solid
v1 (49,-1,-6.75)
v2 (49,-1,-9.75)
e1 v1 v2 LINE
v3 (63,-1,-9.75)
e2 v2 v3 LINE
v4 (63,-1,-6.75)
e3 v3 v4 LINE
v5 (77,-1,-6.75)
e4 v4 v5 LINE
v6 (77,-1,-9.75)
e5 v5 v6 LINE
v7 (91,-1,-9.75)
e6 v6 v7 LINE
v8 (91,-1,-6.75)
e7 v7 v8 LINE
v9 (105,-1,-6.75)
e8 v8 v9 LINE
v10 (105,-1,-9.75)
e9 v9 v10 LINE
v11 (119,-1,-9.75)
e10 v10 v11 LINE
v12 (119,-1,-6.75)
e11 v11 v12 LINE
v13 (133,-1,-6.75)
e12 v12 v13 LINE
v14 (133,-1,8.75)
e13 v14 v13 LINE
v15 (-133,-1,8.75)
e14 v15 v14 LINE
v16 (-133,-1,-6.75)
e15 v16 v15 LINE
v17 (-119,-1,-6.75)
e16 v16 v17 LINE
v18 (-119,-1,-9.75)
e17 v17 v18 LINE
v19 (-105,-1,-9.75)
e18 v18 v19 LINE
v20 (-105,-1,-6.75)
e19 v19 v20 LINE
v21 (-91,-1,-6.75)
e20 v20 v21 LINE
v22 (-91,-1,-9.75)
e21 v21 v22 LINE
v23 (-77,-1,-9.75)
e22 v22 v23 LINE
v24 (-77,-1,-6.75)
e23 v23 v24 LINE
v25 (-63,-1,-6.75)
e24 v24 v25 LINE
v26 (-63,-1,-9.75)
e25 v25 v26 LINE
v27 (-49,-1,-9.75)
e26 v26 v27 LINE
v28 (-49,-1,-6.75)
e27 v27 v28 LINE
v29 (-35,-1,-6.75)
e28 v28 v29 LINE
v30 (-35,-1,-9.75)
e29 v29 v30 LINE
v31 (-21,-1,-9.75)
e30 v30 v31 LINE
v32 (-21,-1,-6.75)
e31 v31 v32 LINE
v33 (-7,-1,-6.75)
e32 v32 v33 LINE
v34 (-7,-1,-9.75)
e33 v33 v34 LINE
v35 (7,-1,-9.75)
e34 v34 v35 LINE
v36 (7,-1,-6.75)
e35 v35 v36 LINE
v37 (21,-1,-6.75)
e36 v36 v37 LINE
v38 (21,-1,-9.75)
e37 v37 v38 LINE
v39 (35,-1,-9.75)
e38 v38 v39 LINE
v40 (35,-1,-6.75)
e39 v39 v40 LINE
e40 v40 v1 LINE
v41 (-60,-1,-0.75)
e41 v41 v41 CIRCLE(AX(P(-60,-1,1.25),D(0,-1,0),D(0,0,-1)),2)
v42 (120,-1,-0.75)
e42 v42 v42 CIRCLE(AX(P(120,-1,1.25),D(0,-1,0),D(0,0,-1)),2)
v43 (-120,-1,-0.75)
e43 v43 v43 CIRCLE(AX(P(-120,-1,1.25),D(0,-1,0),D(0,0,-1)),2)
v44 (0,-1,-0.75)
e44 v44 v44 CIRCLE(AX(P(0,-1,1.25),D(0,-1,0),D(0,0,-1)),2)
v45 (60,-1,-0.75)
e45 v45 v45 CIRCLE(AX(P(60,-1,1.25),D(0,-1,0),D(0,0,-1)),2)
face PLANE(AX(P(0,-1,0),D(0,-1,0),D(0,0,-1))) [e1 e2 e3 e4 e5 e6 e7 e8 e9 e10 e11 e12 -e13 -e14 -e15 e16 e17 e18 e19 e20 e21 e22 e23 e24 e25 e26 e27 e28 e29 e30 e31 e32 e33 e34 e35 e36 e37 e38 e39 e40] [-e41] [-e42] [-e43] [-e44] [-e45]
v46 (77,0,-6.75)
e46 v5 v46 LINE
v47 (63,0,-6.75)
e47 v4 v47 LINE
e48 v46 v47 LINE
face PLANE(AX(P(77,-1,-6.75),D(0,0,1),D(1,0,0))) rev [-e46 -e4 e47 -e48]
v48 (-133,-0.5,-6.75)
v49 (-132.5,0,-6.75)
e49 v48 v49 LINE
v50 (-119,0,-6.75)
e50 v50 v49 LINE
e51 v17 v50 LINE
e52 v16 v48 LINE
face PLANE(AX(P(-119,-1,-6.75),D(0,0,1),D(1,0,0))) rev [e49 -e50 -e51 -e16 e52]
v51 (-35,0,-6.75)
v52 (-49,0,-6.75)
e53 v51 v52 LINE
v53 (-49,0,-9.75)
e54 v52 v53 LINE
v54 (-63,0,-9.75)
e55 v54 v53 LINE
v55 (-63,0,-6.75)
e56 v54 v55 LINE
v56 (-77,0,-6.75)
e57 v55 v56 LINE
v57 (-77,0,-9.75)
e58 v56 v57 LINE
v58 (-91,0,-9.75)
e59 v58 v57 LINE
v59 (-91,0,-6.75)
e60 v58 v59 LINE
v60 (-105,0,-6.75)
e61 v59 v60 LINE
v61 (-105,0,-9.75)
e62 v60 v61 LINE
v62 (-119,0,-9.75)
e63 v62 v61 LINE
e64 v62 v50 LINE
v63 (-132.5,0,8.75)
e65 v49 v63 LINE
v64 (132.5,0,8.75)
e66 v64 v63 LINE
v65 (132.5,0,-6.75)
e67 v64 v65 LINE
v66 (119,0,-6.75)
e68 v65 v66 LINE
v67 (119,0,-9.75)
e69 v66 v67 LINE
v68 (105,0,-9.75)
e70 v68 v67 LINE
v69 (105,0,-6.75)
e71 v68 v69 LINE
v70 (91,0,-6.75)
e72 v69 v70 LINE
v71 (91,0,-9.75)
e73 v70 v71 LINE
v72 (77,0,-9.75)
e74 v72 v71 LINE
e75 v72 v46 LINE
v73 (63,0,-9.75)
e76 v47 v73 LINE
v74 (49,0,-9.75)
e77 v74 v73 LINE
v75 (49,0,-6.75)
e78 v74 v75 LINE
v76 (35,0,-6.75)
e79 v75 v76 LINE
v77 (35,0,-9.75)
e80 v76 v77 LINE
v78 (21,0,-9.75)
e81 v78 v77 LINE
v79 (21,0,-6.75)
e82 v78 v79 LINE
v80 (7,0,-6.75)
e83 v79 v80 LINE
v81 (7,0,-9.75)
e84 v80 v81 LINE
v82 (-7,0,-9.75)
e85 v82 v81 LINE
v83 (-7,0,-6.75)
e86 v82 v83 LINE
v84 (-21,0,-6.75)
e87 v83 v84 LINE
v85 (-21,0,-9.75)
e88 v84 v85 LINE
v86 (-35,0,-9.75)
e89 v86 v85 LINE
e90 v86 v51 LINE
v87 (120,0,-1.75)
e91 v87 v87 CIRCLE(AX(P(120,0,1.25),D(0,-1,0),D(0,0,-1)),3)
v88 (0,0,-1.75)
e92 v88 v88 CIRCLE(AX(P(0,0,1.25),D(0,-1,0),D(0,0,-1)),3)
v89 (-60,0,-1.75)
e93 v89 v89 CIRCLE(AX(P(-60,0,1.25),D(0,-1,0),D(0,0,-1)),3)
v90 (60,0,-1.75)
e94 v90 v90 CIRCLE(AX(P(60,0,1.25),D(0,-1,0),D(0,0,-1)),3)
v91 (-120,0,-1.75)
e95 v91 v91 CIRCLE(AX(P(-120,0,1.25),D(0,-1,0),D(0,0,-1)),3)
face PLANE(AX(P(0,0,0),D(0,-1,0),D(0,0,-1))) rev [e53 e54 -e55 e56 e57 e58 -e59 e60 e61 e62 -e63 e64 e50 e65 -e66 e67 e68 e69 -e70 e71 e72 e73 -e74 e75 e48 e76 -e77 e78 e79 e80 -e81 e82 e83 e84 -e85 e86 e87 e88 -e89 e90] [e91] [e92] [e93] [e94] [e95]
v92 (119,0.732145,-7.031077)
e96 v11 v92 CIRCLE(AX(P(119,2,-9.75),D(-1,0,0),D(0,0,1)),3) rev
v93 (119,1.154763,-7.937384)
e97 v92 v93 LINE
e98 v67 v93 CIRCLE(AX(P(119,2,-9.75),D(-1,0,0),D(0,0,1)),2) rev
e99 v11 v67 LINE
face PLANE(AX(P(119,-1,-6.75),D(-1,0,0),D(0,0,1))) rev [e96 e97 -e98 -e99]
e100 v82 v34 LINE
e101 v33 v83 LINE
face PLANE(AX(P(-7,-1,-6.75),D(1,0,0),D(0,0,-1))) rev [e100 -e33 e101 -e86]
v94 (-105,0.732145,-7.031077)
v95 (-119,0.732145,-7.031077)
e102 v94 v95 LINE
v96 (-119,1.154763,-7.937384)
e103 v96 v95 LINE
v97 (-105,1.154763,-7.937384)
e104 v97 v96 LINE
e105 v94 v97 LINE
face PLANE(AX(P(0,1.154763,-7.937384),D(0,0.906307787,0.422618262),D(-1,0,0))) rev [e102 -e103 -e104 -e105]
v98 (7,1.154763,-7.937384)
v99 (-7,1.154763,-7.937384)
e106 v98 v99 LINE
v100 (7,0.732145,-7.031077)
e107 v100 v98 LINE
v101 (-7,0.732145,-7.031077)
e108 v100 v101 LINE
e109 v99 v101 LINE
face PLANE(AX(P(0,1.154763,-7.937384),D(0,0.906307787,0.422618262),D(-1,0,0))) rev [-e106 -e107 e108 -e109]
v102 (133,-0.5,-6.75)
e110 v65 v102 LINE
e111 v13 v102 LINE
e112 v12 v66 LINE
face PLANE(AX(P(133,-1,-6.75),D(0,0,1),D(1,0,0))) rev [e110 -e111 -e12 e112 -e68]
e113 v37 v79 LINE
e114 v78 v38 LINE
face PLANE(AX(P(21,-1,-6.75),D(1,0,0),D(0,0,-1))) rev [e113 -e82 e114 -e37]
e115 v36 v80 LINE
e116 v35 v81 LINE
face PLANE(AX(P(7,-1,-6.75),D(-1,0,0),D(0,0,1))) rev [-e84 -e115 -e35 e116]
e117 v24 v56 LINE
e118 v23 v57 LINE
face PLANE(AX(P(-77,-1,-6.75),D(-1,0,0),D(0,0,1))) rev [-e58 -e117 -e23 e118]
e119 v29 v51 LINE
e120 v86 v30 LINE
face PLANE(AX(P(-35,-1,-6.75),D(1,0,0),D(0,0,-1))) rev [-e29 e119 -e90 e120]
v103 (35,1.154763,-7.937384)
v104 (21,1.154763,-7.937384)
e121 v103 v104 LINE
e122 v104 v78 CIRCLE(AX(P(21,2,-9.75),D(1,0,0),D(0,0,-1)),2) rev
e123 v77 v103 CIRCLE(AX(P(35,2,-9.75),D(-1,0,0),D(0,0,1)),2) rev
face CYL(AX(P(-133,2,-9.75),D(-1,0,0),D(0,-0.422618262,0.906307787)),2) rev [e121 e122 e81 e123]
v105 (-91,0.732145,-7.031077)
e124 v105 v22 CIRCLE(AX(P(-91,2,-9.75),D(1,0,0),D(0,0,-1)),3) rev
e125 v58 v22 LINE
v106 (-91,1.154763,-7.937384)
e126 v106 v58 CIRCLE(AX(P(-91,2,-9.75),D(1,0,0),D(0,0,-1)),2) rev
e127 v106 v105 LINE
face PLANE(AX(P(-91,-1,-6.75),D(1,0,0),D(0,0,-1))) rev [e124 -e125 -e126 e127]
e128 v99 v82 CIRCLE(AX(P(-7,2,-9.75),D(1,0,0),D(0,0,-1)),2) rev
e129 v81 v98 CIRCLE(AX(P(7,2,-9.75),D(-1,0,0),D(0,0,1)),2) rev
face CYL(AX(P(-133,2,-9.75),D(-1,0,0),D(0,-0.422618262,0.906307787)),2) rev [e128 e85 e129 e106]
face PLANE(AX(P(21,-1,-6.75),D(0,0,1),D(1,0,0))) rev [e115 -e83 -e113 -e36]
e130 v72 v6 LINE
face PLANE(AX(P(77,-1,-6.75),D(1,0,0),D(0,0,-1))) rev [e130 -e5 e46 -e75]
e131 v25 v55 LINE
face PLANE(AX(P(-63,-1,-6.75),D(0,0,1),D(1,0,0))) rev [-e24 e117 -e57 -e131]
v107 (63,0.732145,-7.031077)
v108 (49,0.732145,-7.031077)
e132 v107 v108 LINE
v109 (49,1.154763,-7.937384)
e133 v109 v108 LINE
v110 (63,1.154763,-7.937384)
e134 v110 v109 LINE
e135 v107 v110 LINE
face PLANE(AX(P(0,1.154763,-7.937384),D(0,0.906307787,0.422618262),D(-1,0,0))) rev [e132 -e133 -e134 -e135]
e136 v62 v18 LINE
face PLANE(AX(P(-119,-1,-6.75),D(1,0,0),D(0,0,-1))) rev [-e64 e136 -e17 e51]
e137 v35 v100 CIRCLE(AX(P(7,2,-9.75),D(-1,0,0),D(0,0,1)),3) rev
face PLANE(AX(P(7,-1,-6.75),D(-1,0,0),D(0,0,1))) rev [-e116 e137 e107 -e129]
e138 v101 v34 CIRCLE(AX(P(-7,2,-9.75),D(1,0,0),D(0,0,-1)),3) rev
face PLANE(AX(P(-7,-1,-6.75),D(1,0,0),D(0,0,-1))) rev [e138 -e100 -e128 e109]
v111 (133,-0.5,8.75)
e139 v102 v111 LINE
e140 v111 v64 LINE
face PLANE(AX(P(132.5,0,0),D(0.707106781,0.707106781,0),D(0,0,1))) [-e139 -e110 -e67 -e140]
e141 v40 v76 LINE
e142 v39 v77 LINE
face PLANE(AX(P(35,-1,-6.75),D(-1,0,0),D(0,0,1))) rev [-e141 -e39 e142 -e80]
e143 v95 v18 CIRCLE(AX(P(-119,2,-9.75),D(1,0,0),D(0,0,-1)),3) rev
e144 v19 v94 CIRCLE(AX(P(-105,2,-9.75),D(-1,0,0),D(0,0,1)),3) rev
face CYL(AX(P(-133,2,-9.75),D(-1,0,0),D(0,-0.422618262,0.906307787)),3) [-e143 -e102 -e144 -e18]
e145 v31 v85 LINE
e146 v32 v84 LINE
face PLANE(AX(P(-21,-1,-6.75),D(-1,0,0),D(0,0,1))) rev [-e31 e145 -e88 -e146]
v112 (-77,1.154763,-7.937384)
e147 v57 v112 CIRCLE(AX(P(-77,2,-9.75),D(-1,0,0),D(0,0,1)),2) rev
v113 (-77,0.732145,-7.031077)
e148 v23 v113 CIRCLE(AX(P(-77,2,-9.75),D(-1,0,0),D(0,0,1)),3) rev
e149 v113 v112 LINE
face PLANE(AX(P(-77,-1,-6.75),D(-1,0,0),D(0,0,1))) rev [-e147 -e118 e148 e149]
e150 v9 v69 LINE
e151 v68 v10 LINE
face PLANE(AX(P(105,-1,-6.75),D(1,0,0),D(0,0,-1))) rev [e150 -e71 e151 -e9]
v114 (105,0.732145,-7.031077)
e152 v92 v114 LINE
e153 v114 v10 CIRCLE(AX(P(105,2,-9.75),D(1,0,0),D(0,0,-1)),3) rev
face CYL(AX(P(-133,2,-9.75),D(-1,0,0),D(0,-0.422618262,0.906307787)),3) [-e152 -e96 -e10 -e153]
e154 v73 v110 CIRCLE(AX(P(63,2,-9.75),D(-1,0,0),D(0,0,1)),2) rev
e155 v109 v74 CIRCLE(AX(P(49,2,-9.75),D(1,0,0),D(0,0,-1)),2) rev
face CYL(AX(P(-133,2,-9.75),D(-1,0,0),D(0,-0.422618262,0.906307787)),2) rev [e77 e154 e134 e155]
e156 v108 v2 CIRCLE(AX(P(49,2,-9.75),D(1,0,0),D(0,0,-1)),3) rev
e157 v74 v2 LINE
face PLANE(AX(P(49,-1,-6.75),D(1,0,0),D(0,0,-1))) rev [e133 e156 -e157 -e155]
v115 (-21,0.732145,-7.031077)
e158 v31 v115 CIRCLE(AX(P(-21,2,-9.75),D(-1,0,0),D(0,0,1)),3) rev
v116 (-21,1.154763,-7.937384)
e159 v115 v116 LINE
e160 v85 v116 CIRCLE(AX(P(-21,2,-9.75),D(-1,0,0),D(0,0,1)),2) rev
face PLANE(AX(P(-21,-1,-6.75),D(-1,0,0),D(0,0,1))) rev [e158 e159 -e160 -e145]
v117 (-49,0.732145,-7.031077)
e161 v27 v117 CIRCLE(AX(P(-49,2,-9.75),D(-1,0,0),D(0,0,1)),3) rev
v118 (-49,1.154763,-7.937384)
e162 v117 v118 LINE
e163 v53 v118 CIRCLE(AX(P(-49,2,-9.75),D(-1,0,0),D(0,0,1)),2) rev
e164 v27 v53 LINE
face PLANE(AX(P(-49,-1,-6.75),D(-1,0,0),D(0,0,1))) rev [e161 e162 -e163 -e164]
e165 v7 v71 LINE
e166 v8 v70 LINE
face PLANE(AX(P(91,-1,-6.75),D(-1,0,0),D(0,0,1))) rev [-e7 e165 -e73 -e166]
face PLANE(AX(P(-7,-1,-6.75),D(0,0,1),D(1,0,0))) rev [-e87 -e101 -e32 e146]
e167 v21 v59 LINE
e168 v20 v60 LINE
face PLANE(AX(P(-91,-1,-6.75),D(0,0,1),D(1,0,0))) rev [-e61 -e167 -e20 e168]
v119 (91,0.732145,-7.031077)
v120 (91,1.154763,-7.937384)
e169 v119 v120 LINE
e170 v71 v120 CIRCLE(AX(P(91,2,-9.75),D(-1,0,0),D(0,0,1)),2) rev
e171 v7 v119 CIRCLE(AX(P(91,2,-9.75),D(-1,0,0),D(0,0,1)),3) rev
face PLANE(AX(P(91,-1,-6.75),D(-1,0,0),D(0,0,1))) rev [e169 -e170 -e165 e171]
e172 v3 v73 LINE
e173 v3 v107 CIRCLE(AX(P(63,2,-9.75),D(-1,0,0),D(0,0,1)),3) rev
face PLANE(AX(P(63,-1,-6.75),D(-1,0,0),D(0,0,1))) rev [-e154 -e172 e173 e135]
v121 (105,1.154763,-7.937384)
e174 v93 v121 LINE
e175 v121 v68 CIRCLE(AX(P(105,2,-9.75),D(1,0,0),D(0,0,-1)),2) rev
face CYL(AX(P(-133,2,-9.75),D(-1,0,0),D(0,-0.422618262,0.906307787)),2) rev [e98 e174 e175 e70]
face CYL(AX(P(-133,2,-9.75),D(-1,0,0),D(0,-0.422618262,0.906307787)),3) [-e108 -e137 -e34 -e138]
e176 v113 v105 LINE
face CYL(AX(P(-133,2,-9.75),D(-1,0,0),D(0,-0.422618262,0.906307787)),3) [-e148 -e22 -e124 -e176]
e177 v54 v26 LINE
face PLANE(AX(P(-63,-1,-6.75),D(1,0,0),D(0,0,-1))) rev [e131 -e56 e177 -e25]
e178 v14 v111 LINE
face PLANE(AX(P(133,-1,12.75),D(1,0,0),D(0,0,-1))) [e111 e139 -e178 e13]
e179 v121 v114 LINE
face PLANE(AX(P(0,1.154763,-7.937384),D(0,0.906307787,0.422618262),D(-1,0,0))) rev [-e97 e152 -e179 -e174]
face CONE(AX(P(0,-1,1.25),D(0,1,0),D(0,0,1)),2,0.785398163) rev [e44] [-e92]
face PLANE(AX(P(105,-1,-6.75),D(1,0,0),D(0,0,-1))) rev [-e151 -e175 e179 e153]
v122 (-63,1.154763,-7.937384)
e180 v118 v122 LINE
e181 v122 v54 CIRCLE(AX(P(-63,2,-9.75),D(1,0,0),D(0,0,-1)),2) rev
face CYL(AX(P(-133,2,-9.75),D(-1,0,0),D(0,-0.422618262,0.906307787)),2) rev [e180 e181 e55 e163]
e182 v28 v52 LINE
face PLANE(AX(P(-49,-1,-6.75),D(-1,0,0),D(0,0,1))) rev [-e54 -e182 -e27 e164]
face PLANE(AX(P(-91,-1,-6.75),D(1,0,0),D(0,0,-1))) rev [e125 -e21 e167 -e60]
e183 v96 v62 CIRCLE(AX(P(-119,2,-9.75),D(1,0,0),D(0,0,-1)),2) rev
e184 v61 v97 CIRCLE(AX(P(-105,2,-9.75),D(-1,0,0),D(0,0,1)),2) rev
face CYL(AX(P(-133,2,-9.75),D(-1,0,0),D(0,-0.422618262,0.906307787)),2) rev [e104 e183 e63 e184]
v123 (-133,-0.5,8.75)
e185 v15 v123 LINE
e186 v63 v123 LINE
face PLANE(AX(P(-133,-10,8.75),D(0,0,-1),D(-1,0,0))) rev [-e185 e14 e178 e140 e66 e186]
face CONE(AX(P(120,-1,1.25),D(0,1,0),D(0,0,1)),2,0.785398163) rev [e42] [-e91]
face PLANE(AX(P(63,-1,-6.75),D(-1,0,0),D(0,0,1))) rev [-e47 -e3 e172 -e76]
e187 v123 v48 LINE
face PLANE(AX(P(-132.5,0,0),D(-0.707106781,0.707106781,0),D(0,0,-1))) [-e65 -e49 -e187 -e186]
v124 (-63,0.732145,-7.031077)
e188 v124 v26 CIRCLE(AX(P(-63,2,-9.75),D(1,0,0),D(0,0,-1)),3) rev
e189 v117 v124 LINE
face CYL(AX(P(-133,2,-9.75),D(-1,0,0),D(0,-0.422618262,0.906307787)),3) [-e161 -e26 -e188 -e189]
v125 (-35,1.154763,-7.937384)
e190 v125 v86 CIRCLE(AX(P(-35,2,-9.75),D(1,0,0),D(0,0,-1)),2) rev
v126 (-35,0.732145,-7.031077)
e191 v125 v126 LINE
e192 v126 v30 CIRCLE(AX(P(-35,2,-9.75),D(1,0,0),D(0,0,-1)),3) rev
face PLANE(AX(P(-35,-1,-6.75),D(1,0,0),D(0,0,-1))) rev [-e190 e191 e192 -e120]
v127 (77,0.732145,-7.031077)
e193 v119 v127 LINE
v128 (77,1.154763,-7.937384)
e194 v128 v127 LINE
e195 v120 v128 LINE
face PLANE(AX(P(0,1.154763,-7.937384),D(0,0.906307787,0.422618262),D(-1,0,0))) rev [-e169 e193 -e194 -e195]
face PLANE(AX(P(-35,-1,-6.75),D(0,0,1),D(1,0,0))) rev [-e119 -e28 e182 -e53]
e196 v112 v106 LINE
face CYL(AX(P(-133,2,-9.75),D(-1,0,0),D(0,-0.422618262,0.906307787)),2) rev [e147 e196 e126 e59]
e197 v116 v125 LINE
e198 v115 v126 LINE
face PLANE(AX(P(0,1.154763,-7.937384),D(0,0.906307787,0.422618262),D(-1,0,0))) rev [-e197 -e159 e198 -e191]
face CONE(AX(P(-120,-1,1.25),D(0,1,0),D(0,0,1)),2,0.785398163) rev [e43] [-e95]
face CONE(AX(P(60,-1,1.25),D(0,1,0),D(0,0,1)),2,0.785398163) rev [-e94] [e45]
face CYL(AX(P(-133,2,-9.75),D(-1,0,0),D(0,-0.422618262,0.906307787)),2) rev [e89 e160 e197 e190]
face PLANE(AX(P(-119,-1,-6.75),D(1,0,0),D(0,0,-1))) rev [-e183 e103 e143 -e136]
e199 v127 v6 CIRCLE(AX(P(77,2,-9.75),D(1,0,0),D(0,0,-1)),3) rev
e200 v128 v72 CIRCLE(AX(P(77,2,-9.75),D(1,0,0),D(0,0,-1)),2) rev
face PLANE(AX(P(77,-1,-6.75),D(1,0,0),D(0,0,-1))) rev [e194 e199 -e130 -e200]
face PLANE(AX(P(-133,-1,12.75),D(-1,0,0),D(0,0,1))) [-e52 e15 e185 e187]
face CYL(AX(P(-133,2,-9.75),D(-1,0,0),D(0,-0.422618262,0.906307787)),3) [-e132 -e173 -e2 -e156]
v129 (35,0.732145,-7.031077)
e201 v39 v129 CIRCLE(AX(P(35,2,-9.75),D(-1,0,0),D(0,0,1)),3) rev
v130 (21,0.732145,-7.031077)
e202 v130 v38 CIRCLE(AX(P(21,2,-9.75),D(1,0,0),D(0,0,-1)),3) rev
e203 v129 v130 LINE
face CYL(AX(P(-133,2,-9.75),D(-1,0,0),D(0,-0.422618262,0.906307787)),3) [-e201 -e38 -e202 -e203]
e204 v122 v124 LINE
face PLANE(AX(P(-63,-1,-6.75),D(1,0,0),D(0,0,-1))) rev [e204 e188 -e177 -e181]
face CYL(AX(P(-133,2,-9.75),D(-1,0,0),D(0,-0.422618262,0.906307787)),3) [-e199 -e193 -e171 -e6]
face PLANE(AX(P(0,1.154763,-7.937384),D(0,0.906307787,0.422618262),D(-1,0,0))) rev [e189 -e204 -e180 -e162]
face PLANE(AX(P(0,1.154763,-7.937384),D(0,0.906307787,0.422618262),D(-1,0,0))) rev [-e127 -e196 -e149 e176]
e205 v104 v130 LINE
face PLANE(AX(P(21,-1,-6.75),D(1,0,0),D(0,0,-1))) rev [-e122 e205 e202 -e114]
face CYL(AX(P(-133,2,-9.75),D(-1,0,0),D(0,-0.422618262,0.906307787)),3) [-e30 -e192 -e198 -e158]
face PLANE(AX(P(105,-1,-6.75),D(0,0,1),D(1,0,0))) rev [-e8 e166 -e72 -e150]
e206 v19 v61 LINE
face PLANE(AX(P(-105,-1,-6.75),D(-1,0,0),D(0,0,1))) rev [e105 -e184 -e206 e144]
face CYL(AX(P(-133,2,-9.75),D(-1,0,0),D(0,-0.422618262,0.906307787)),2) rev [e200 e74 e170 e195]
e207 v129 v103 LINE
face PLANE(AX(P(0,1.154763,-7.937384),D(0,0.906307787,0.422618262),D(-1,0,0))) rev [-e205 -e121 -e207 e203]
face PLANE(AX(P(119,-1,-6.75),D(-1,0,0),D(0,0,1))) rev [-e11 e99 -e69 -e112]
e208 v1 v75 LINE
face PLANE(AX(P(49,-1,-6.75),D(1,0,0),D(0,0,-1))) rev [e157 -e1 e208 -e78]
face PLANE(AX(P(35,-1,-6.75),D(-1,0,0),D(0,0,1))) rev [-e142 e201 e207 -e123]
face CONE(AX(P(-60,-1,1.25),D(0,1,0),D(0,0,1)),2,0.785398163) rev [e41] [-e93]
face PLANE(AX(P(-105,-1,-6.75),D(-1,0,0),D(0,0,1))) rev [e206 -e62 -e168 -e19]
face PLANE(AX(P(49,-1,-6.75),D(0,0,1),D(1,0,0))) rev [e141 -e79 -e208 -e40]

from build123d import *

# Parameters (mm, degrees)
SKETCH1_W          = 266
SKETCH1_H          = 25.5
BASE_FLANGE1_DEPTH = 1
HEM1_START         = -133
HEM1_DEPTH         = 266
HEM1_2_DEPTH       = 266
CUT_EXTRUDE1_START = -134.703262862
SKETCH8_W          = 14
SKETCH8_H          = 6
CUT_EXTRUDE1_DEPTH = 259.406525724
LPATTERN1_COUNT    = 11
LPATTERN1_PITCH    = 28
CHAMFER1_SIZE      = 0.5
SKETCH10_W         = 266
SKETCH10_H         = 4
CUT_EXTRUDE3_DEPTH = 10
SKETCH9_R          = 2
CUT_EXTRUDE2_DEPTH = 10
LPATTERN2_COUNT    = 5
LPATTERN2_PITCH    = 60
CHAMFER2_SIZE      = 1


# Read off the part's stored shape, not the designer's step: Hem1
# Sheet-metal steps are written as plain solids
with BuildPart() as part:
    # Sketch1 → Base-Flange1 (new body)
    with BuildSketch(Plane(origin=(0, 0, 0), x_dir=(1, 0, 0), z_dir=(0, 1, 0))):
        Rectangle(SKETCH1_W, SKETCH1_H)
    extrude(amount=-BASE_FLANGE1_DEPTH)

    # Hem1 outline → Hem1 (cut)
    with BuildSketch(Plane.YZ.offset(HEM1_START)):
        with BuildLine():
            Line((0, -12.75), (0, -11.986067977))
            ThreePointArc((0, -11.986067977), (-0.738612788, -10.974744871), (-1, -9.75))
            Line((-1, -9.75), (-1, -12.75))
            Line((-1, -12.75), (0, -12.75))
        make_face()
    extrude(amount=HEM1_DEPTH, mode=Mode.SUBTRACT)

    # Hem1 2 outline → Hem1 2 (add)
    with BuildSketch(Plane.YZ.offset(HEM1_START)):
        with BuildLine():
            Line((0.732145215, -7.031076639), (1.154763477, -7.937384426))
            ThreePointArc((1.154763477, -7.937384426), (3.686782892, -10.824599218), (0, -9.75))
            Line((0, -9.75), (0, -11.986067977))
            ThreePointArc((0, -11.986067977), (4.967777538, -10.18851623), (0.732145215, -7.031076639))
        make_face()
    extrude(amount=HEM1_2_DEPTH)

    # Sketch8 → Cut-Extrude1 (cut)
    with BuildSketch(Plane(origin=(0, 0, 0), x_dir=(1, 0, 0), z_dir=(0, 1, 0)).offset(CUT_EXTRUDE1_START)):
        with Locations((126, 9.75)):
            Rectangle(SKETCH8_W, SKETCH8_H)
    cut_extrude1 = extrude(amount=CUT_EXTRUDE1_DEPTH, mode=Mode.SUBTRACT)

    # LPattern1: Cut-Extrude1 ×11
    with Locations(*[(-i * LPATTERN1_PITCH, 0, 0) for i in range(1, LPATTERN1_COUNT)]):
        add(cut_extrude1, mode=Mode.SUBTRACT)

    # Chamfer1
    chamfer1_edges = [part.edges().sort_by_distance(p)[0] for p in [
        (-133, 0, 3),
        (0, 0, 12.75),
        (133, 0, 3),
    ]]
    chamfer(chamfer1_edges, length=CHAMFER1_SIZE)

    # Sketch10 → Cut-Extrude3 (cut)
    with BuildSketch(Plane(origin=(0, 0, 0), x_dir=(1, 0, 0), z_dir=(0, 1, 0))):
        with Locations((0, -10.75)):
            Rectangle(SKETCH10_W, SKETCH10_H)
    extrude(amount=-CUT_EXTRUDE3_DEPTH, mode=Mode.SUBTRACT)

    # Sketch9 → Cut-Extrude2 (cut)
    with BuildSketch(Plane(origin=(0, 0, 0), x_dir=(1, 0, 0), z_dir=(0, 1, 0))):
        with Locations(Location((-120, -1.25, 0), (0, 0, 270))):
            Circle(SKETCH9_R)
    cut_extrude2 = extrude(amount=-CUT_EXTRUDE2_DEPTH, mode=Mode.SUBTRACT)

    # LPattern2: Cut-Extrude2 ×5
    with Locations(*[(i * LPATTERN2_PITCH, 0, 0) for i in range(1, LPATTERN2_COUNT)]):
        add(cut_extrude2, mode=Mode.SUBTRACT)

    # Chamfer2
    chamfer2_edges = [part.edges().sort_by_distance(p)[0] for p in [
        (-120, 0, -0.75),
        (-60, 0, -0.75),
        (0, 0, -0.75),
        (60, 0, -0.75),
        (120, 0, -0.75),
    ]]
    chamfer(chamfer2_edges, length=CHAMFER2_SIZE - 0.0001)  # a hair under: the kernel refuses the full size


solid = part.part
